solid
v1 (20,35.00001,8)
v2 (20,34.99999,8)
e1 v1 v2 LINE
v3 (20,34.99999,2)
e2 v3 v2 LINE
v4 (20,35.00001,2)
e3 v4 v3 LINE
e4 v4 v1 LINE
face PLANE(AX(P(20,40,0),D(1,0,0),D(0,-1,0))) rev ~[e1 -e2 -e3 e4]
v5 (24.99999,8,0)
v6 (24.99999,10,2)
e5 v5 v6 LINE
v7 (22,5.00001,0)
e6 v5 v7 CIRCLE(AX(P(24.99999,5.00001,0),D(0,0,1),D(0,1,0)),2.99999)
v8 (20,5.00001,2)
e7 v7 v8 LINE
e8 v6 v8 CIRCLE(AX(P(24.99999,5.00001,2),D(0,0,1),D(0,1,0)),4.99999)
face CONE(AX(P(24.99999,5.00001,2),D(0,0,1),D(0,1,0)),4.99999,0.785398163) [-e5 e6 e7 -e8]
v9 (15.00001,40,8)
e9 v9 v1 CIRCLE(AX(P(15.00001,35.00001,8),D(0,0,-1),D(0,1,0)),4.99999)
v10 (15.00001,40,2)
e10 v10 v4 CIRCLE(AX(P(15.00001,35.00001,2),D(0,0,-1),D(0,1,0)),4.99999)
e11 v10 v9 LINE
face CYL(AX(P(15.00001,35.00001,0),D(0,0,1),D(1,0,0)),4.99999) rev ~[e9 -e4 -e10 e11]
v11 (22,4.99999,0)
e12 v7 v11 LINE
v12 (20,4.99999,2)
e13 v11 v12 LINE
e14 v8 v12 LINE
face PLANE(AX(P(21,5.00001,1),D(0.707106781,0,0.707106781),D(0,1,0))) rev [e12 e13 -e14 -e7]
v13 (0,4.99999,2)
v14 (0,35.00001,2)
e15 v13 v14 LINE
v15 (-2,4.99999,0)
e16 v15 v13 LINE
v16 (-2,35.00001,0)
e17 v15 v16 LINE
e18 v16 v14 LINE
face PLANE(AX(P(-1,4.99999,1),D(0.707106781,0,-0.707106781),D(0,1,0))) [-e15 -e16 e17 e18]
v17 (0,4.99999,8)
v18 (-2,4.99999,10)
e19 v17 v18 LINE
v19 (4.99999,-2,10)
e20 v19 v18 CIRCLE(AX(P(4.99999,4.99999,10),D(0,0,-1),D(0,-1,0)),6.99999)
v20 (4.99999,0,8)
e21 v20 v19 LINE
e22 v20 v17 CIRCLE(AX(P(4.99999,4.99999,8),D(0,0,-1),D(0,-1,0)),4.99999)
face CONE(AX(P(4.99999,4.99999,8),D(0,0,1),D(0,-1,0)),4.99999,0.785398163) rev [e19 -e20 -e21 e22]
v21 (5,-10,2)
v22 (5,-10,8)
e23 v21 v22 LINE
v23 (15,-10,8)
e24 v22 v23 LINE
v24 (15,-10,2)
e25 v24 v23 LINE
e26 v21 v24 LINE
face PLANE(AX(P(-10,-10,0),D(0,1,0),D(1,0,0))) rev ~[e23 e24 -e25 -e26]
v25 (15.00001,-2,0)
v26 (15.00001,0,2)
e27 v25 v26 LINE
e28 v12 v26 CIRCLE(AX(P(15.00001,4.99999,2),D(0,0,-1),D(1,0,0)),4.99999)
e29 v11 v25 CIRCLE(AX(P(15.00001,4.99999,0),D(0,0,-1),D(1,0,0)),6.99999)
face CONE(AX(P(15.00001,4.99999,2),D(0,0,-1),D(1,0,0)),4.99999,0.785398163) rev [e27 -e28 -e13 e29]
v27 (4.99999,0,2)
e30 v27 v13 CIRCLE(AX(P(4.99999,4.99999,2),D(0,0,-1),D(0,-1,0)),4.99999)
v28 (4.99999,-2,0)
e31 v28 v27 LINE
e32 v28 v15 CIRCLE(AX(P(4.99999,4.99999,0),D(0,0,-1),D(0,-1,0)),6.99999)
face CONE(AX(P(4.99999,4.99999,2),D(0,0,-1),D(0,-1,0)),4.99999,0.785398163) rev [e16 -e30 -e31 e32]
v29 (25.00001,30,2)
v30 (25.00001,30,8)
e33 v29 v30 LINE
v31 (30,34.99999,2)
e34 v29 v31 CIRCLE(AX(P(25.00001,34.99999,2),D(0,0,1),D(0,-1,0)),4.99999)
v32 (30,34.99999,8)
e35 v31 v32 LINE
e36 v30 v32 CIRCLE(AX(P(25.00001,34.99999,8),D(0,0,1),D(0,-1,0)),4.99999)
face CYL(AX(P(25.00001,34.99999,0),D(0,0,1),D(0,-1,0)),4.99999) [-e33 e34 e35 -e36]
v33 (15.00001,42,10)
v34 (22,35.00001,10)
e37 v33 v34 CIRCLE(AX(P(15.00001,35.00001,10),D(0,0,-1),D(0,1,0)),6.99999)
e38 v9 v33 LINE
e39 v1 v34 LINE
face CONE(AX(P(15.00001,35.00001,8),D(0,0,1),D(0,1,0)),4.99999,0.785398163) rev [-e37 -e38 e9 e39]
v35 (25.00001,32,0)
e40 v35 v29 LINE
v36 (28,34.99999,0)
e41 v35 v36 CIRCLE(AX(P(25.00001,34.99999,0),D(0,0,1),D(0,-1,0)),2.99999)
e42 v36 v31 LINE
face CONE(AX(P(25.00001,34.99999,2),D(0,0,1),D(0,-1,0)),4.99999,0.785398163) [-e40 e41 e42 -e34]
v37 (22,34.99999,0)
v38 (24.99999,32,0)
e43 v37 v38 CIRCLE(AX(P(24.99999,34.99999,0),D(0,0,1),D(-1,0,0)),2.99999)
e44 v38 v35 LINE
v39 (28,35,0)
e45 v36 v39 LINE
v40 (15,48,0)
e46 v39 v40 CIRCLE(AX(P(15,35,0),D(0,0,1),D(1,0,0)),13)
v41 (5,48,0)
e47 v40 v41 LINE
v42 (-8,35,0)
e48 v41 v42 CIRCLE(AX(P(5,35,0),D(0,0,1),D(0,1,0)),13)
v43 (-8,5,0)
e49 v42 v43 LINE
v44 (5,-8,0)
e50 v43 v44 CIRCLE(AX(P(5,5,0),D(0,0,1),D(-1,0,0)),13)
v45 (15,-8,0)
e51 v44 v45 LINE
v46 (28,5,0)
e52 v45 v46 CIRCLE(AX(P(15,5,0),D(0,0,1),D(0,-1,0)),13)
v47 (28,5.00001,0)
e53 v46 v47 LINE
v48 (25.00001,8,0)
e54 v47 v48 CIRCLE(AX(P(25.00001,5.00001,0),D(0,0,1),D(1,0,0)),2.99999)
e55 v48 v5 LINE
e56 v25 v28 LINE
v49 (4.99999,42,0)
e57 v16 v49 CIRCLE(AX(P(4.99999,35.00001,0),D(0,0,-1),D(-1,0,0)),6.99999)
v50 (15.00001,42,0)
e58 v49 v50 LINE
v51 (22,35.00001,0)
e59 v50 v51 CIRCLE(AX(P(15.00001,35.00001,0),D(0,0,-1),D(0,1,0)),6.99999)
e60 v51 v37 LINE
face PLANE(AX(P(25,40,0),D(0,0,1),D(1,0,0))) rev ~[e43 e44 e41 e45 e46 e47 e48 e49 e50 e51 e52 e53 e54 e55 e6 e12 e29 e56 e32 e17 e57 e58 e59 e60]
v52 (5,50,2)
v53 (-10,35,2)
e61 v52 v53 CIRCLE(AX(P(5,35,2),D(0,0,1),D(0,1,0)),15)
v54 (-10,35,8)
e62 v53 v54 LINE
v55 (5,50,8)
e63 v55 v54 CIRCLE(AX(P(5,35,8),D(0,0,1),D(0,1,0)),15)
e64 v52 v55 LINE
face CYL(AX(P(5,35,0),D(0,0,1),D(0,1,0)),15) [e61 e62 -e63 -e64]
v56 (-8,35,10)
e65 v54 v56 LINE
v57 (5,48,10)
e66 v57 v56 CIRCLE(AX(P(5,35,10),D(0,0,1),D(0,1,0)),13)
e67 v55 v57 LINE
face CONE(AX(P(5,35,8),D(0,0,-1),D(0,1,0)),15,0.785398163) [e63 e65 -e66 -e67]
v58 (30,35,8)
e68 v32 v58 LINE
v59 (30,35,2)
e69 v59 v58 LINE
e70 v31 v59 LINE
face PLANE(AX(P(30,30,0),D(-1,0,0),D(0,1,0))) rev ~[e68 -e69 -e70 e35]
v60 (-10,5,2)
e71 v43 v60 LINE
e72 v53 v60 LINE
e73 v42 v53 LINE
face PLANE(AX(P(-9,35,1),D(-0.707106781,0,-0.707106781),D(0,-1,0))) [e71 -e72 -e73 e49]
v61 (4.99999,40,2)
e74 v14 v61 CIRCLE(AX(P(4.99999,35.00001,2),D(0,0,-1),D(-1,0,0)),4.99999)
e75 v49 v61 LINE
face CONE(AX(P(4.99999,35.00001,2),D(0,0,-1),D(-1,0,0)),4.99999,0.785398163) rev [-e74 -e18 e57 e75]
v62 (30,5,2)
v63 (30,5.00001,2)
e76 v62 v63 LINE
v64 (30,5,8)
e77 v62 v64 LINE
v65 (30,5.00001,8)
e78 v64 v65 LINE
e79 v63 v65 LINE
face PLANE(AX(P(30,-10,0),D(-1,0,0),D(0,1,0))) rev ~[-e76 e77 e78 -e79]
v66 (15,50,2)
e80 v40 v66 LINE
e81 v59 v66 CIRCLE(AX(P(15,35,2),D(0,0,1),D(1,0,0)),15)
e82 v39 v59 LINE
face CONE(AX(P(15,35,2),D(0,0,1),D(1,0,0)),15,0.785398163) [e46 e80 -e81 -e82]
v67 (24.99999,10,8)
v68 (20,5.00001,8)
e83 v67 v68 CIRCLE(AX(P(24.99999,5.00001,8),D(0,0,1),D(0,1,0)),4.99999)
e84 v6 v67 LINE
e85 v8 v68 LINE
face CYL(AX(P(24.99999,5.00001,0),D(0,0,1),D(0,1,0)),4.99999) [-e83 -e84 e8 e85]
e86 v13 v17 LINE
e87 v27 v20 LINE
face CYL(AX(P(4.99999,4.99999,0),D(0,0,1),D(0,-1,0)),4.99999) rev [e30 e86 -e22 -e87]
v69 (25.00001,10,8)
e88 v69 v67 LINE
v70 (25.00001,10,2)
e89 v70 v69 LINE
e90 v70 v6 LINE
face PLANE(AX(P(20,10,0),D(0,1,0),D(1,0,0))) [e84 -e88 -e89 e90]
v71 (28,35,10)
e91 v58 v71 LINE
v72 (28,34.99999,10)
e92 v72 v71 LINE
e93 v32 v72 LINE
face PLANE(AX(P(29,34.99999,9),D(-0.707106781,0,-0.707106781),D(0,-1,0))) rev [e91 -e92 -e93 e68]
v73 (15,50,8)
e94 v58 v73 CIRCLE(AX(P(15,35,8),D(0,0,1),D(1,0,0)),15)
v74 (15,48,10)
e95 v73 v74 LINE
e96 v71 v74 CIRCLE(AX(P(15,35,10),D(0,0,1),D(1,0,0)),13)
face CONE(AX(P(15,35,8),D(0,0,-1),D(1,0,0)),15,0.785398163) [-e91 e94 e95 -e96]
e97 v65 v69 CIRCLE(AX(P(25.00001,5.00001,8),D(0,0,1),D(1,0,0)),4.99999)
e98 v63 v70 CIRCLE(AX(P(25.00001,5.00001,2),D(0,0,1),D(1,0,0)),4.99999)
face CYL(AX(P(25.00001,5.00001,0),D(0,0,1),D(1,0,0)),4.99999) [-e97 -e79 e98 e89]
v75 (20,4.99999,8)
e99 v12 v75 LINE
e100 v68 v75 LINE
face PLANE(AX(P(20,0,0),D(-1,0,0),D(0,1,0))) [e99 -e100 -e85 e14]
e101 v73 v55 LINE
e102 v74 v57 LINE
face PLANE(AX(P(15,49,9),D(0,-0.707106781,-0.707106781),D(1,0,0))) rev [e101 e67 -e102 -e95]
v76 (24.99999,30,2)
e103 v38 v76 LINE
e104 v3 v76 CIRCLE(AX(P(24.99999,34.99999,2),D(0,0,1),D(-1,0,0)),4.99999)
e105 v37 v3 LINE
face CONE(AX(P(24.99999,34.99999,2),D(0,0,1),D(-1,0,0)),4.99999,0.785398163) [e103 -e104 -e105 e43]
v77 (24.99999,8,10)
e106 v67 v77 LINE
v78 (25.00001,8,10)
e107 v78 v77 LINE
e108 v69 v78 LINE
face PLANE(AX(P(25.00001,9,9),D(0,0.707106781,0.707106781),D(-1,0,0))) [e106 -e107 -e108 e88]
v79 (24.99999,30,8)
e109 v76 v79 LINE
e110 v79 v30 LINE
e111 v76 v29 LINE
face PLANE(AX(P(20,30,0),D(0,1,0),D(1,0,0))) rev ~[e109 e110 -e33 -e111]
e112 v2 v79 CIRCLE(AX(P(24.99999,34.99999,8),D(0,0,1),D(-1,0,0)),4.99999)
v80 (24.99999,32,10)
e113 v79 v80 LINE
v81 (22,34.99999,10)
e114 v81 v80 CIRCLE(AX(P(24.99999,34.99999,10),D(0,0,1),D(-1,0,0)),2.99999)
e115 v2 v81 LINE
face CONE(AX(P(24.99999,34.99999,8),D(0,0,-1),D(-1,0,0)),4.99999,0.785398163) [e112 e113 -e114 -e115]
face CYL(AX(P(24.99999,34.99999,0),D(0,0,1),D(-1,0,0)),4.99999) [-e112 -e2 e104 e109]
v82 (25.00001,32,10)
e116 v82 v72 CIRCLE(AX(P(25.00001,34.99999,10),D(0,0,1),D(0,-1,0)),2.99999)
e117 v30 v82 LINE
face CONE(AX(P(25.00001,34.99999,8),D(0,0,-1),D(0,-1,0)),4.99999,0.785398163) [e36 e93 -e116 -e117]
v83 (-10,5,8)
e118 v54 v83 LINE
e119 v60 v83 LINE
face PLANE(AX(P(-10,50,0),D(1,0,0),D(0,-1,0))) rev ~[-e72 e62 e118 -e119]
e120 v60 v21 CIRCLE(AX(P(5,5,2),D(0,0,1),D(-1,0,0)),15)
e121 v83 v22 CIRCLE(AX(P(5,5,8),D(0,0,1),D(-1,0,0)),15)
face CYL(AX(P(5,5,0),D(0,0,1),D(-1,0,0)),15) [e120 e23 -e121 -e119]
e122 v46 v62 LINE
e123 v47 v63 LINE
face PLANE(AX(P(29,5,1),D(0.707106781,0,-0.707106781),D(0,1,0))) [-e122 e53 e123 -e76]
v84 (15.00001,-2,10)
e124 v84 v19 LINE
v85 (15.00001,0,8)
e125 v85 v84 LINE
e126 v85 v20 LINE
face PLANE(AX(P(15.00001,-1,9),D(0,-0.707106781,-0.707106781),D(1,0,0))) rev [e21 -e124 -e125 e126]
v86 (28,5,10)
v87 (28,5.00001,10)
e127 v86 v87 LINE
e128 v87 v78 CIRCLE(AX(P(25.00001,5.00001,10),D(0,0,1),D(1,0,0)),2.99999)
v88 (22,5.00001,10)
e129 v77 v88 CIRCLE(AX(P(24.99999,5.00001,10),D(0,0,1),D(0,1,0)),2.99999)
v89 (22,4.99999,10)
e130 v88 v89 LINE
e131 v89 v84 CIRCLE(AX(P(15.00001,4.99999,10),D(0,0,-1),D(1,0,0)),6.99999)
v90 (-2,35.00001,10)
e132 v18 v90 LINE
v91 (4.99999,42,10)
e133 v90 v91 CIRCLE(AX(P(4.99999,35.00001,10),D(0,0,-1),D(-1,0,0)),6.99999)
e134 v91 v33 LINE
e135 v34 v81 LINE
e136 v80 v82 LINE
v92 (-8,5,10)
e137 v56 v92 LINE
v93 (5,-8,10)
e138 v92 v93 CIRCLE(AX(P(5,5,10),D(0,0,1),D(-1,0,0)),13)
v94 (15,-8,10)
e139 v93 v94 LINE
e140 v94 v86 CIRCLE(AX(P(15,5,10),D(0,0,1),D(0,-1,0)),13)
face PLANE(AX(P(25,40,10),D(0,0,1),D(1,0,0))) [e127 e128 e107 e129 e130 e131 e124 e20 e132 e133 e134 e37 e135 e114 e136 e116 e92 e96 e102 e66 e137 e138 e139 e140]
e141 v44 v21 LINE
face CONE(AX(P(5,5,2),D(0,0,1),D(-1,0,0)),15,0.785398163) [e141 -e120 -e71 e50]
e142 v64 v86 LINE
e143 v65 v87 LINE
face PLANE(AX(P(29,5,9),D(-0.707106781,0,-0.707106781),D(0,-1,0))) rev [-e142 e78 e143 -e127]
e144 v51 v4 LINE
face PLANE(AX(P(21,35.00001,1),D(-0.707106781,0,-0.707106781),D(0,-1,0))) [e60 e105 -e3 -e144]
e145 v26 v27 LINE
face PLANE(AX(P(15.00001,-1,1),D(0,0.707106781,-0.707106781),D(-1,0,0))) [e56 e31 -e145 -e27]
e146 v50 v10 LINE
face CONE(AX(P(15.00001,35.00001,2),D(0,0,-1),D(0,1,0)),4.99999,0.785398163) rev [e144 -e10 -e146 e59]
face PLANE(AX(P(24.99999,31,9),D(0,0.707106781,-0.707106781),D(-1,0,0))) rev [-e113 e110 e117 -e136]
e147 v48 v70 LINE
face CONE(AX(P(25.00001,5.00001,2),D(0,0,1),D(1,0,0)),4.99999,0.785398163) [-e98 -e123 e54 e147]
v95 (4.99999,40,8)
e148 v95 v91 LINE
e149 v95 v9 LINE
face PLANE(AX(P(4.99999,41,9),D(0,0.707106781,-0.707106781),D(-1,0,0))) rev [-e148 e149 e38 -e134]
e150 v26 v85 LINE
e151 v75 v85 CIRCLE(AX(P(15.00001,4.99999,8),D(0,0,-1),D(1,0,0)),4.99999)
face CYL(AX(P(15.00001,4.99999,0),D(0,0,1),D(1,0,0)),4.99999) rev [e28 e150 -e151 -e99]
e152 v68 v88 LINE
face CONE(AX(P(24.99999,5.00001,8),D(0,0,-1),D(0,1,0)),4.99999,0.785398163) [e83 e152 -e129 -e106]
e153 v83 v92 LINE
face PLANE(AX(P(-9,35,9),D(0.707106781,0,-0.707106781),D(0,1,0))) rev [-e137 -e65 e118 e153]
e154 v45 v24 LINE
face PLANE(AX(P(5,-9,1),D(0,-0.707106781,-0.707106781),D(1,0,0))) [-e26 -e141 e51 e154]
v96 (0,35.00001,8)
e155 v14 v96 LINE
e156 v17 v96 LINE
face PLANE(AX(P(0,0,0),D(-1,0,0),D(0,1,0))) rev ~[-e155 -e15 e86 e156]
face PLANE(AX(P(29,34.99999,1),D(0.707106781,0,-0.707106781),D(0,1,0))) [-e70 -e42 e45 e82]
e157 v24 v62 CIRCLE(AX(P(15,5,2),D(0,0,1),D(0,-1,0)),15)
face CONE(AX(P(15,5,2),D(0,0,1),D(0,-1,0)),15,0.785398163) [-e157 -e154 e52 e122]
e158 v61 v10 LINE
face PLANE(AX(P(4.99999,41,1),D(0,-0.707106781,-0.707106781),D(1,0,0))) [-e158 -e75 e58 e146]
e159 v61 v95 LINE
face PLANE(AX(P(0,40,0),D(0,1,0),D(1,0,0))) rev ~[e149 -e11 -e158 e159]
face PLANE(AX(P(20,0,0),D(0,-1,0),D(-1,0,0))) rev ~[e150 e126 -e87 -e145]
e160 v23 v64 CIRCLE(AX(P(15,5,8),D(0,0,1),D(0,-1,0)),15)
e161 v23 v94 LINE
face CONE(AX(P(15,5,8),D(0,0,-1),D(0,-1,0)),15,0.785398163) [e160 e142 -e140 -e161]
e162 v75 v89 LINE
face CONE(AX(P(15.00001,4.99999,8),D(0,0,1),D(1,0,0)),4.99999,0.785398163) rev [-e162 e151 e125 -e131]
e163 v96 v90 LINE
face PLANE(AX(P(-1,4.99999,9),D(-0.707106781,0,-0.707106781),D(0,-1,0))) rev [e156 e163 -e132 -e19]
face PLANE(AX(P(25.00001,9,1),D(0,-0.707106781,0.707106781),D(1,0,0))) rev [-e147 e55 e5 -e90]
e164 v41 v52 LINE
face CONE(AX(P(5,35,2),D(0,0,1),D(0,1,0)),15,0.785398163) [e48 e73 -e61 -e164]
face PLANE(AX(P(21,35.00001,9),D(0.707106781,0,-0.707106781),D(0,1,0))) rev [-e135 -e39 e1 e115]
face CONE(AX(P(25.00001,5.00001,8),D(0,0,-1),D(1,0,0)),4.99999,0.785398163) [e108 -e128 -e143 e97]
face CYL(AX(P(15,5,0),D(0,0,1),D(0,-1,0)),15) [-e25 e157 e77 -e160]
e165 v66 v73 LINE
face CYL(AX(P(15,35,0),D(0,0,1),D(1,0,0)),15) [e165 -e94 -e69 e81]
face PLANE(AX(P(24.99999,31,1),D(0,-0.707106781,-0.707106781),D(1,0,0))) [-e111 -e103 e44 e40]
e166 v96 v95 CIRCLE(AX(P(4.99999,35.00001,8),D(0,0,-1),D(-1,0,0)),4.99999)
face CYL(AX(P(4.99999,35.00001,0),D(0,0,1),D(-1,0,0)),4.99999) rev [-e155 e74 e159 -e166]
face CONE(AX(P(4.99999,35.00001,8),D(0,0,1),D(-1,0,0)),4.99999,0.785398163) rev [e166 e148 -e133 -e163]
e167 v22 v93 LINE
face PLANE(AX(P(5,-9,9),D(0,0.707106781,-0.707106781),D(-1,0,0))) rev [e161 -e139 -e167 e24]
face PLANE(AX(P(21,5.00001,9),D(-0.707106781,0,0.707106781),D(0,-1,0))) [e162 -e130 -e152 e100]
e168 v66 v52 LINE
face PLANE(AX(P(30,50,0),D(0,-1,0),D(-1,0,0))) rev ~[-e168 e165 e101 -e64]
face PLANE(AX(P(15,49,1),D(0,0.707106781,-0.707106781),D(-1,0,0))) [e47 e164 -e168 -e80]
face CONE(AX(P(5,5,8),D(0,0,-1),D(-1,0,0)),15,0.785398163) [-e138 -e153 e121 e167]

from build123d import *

# Parameters (mm, degrees)
F0_W     = 10
F0_H     = 10
F1_DEPTH = 10
F2_R     = 4.99999
F3_R     = 15
F4_SIZE  = 2


# Not quite as in the source:
# - a fillet or chamfer is up to 0.001 mm smaller than in the source, because OpenCascade refuses the exact size


with BuildPart() as f1:
    # F0 (on Top) → F1 (new body)
    with BuildSketch(Plane.XY):
        Polygon((20, 50), (20, 40), (20, 30), (30, 30), (30, 50), align=None)
        Polygon((-10, 40), (0, 40), (20, 40), (20, 50), (-10, 50), align=None)
        Polygon((0, -10), (0, 0), (0, 40), (-10, 40), (-10, -10), align=None)
        Polygon((20, 0), (0, 0), (0, -10), (30, -10), (30, 0), align=None)
        with Locations((25, 5)):
            Rectangle(F0_W, F0_H)
    extrude(amount=F1_DEPTH)

    # F2 (radius 5 in the source; OpenCascade refuses exactly that, so slightly less here)
    f2_edges = [f1.edges().sort_by_distance(p)[0] for p in [
        (0, 40, 5),
        (20, 30, 5),
        (30, 30, 5),
        (0, 0, 5),
        (20, 10, 5),
        (30, 10, 5),
        (20, 40, 5),
        (20, 0, 5),
    ]]
    fillet(f2_edges, radius=F2_R)

    # F3
    f3_edges = [f1.edges().sort_by_distance(p)[0] for p in [
        (-10, 50, 5),
        (30, 50, 5),
        (30, -10, 5),
        (-10, -10, 5),
    ]]
    fillet(f3_edges, radius=F3_R)

    # F4
    f4_edges = [f1.edges().sort_by_distance(p)[0] for p in [
        (10, 50, 10),
        (10, 50, 0),
    ]]
    chamfer(f4_edges, length=F4_SIZE)


solid = f1.part
